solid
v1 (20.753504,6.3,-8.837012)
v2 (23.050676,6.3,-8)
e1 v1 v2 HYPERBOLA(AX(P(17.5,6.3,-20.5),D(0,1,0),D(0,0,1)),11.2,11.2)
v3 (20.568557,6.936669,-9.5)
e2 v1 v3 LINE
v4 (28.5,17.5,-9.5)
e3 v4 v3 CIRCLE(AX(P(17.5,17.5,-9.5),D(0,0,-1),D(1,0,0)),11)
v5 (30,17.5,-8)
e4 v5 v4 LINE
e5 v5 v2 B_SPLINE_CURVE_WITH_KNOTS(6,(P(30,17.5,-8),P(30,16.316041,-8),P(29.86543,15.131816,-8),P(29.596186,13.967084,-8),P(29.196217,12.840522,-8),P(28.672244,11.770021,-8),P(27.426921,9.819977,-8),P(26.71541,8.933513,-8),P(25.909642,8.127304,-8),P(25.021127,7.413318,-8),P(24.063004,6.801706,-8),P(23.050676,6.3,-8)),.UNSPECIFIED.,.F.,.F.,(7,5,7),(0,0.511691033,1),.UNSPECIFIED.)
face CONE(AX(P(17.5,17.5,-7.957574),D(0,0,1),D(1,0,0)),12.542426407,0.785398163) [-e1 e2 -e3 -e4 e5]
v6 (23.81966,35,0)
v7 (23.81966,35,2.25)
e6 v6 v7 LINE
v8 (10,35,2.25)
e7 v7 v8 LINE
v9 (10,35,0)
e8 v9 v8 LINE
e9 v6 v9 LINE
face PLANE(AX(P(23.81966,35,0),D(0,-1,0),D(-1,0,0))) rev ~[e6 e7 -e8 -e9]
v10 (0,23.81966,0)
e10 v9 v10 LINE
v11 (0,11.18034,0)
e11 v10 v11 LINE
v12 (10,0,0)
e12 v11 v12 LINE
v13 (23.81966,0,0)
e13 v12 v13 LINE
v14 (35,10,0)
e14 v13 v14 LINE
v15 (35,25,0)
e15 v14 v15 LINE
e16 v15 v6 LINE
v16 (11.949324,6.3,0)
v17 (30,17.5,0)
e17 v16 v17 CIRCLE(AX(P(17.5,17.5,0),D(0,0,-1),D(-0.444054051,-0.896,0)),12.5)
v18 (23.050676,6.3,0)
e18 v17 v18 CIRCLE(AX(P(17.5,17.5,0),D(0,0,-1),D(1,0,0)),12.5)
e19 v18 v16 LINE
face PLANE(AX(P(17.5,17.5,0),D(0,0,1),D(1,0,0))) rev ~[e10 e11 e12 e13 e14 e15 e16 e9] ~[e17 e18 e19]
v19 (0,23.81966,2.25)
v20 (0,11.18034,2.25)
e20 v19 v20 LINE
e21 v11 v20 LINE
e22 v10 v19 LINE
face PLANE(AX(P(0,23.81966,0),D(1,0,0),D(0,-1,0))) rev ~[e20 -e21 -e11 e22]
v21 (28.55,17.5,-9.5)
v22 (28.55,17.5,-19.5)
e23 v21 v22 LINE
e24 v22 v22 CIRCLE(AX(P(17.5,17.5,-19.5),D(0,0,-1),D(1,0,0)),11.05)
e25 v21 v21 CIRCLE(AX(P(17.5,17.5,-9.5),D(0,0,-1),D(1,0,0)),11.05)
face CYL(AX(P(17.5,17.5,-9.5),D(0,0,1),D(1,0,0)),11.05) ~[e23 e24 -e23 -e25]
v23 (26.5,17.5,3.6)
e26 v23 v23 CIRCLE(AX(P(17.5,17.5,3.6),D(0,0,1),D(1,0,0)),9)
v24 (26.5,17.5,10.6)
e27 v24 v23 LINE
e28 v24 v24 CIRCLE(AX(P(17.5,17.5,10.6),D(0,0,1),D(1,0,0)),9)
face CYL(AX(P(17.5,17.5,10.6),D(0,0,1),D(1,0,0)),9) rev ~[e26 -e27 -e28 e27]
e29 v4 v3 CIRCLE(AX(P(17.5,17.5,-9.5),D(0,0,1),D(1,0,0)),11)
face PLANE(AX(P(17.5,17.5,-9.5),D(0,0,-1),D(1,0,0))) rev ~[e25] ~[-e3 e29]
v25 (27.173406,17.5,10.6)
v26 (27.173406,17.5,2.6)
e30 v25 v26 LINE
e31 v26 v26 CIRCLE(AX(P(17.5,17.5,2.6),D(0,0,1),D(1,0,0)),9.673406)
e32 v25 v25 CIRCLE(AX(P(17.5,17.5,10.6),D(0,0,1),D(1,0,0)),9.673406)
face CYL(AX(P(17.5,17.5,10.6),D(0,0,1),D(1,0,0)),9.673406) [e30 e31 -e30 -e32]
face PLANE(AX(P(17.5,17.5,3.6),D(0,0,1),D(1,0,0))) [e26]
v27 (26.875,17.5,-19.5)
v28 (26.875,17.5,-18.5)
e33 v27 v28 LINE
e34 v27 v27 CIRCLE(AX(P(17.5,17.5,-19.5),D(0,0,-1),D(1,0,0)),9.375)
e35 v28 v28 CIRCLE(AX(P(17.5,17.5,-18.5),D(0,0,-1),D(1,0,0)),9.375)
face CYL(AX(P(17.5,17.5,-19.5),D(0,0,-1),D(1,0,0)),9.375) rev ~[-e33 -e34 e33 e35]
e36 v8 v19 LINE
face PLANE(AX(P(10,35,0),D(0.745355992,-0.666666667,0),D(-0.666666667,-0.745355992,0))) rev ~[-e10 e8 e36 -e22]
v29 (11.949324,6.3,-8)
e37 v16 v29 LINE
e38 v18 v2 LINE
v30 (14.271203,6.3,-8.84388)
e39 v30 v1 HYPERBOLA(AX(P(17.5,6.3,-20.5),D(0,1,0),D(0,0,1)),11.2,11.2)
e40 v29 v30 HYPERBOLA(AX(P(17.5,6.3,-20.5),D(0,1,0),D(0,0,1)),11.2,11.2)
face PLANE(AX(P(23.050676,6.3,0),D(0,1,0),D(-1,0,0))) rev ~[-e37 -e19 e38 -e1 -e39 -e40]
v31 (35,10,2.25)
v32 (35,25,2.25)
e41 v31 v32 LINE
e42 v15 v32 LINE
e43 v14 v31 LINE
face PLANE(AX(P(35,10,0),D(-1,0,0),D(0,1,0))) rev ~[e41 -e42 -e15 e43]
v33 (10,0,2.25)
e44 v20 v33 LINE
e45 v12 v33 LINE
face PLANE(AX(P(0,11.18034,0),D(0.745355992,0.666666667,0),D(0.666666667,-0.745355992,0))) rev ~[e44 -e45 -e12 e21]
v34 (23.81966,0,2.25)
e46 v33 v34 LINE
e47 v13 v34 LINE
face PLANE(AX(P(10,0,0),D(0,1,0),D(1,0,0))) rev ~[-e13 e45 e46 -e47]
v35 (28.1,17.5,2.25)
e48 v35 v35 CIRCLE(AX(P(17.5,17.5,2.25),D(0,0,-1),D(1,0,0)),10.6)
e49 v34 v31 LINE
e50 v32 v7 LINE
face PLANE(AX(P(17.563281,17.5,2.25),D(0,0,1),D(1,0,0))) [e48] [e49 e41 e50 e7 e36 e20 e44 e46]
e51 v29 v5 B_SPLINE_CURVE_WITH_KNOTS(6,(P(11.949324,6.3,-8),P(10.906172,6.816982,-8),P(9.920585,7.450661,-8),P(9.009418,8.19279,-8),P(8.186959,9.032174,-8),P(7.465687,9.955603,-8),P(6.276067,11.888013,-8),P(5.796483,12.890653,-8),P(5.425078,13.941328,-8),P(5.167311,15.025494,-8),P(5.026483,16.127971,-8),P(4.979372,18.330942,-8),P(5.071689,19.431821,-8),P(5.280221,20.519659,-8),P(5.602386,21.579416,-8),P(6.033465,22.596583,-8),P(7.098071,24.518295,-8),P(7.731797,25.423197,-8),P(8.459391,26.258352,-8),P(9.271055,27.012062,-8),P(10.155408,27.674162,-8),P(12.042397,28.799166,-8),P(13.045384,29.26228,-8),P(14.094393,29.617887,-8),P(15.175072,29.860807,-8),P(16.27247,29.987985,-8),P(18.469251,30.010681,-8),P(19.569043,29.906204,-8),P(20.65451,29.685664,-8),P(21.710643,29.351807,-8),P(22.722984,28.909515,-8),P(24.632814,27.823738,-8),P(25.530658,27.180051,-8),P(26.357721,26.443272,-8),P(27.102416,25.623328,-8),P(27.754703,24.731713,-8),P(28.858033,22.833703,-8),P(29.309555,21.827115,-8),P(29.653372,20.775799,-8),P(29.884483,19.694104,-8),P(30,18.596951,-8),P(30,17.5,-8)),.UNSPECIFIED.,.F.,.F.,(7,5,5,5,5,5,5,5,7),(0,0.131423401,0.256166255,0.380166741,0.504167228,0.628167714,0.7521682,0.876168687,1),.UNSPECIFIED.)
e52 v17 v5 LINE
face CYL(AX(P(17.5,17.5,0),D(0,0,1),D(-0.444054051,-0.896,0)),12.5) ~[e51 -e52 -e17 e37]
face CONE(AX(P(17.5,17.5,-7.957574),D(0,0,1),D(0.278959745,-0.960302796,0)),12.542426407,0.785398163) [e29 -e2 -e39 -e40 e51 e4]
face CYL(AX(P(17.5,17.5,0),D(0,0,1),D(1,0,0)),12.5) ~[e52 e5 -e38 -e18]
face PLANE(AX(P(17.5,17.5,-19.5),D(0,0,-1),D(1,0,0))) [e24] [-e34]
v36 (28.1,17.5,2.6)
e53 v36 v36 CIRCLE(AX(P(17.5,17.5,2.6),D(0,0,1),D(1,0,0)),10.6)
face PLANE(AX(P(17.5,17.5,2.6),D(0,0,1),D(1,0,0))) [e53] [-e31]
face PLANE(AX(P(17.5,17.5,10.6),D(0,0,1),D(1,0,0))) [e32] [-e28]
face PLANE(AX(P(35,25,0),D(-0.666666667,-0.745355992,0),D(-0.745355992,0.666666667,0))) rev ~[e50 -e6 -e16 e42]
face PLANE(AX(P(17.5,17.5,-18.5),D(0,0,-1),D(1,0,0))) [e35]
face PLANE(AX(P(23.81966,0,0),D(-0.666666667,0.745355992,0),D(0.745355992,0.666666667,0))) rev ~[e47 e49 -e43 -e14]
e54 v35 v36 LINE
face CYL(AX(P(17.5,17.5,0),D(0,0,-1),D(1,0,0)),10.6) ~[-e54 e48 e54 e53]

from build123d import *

# Parameters (mm, degrees)
F1_DEPTH    = 2.25
F2_R        = 10.6
F3_DEPTH    = 10.6
F5_DEPTH    = 9.5
F6_T2_ANGLE = 286.1981288485
F6_T4_ANGLE = 106.0815039342
F7_R        = 11.05
F8_DEPTH    = 10
F9_R        = 9
F10_DEPTH   = 7
F11_R       = 10.6
F11_R_2     = 9.6734059383
F12_DEPTH   = 8
F13_R       = 9.375
F14_DEPTH   = 1


# Not quite as in the source:
# - a fillet or chamfer that OpenCascade refuses, or shapes differently, is made with other operations: its cross-section is extruded or revolved along the edge and cut away or added


with BuildPart() as f1:
    # F0 (on Top) → F1 (new body)
    with BuildSketch(Plane.XY):
        Polygon((0, 11.1803398875), (10, 0), (23.8196601125, 0), (35, 10), (35, 25), (23.8196601125, 35), (10, 35), (0, 23.8196601125), align=None)
    extrude(amount=F1_DEPTH)

    # F2 (on Top) → F3 (join)
    with BuildSketch(Plane.XY):
        with Locations((17.5, 17.5)):
            Circle(F2_R)
    extrude(amount=F3_DEPTH)

    # F4 (on face) → F5 (join)
    with BuildSketch(Plane(origin=(0, 0, 0), x_dir=(1, 0, 0), z_dir=(0, 0, -1))):
        with BuildLine():
            ThreePointArc((11.9493243654, -6.3), (10.909607198, -28.1215216761), (30, -17.5))
            ThreePointArc((30, -17.5), (28.1215216761, -10.909607198), (23.0506756346, -6.3))
            Line((23.0506756346, -6.3), (11.9493243654, -6.3))
        make_face()
    extrude(amount=F5_DEPTH)

    # F6: chamfer of 1.5 on 2 edges, made by hand

    # F6_s1 → F6_t2 (revolve, cut)
    with BuildSketch(Plane(origin=(20.8261774668, 6.0498263405, 0), x_dir=(0, 0, 1), z_dir=(0.9603027964, 0.2789597449, 0))):
        with BuildLine():
            Line((-7.9575735931, 0.618923005), (-9.5424264069, -0.9659298087))
            Line((-9.5424264069, -0.9659298087), (-9.5724264069, -0.9659298087))
            ThreePointArc((-9.5724264069, -0.9659298087), (-9.53, -0.1947166053), (-9.53, 0.5764965982))
            Line((-9.53, 0.5764965982), (-9.5, 0.6064965982))
            ThreePointArc((-9.5, 0.6064965982), (-8.7287867966, 0.6064965982), (-7.9575735931, 0.648923005))
            Line((-7.9575735931, 0.648923005), (-7.9575735931, 0.618923005))
        make_face()
    revolve(axis=Axis((17.5, 17.5, -9.5), (0, 0, -1)), revolution_arc=F6_T2_ANGLE, mode=Mode.SUBTRACT)

    # F6_s3 → F6_t4 (revolve, cut)
    with BuildSketch(Plane.XZ.offset(-17.5)):
        with BuildLine():
            Line((30.0424264069, -7.9575735931), (28.4575735931, -9.5424264069))
            Line((28.4575735931, -9.5424264069), (28.4575735931, -9.5724264069))
            ThreePointArc((28.4575735931, -9.5724264069), (29.2287867966, -9.53), (30, -9.53))
            Line((30, -9.53), (30.03, -9.5))
            ThreePointArc((30.03, -9.5), (30.03, -8.7287867966), (30.0724264069, -7.9575735931))
            Line((30.0724264069, -7.9575735931), (30.0424264069, -7.9575735931))
        make_face()
    revolve(axis=Axis((17.5, 17.5, -9.5), (0, 0, -1)), revolution_arc=F6_T4_ANGLE, mode=Mode.SUBTRACT)

    # F7 (on face) → F8 (join)
    with BuildSketch(Plane(origin=(0, 0, -9.5), x_dir=(1, 0, 0), z_dir=(0, 0, -1))):
        with Locations((17.5, -17.5)):
            Circle(F7_R)
    extrude(amount=F8_DEPTH)

    # F9 (on face) → F10 (cut)
    with BuildSketch(Plane.XY.offset(10.6)):
        with Locations((17.5, 17.5)):
            Circle(F9_R)
    extrude(amount=-F10_DEPTH, mode=Mode.SUBTRACT)

    # F11 (on face) → F12 (cut)
    with BuildSketch(Plane.XY.offset(10.6)):
        with Locations((17.5, 17.5)):
            Circle(F11_R)
        with Locations((17.5, 17.5)):
            Circle(F11_R_2, mode=Mode.SUBTRACT)
    extrude(amount=-F12_DEPTH, mode=Mode.SUBTRACT)

    # F13 (on face) → F14 (cut)
    with BuildSketch(Plane(origin=(0, 0, -19.5), x_dir=(1, 0, 0), z_dir=(0, 0, -1))):
        with Locations((17.5, -17.5)):
            Circle(F13_R)
    extrude(amount=-F14_DEPTH, mode=Mode.SUBTRACT)


solid = f1.part
